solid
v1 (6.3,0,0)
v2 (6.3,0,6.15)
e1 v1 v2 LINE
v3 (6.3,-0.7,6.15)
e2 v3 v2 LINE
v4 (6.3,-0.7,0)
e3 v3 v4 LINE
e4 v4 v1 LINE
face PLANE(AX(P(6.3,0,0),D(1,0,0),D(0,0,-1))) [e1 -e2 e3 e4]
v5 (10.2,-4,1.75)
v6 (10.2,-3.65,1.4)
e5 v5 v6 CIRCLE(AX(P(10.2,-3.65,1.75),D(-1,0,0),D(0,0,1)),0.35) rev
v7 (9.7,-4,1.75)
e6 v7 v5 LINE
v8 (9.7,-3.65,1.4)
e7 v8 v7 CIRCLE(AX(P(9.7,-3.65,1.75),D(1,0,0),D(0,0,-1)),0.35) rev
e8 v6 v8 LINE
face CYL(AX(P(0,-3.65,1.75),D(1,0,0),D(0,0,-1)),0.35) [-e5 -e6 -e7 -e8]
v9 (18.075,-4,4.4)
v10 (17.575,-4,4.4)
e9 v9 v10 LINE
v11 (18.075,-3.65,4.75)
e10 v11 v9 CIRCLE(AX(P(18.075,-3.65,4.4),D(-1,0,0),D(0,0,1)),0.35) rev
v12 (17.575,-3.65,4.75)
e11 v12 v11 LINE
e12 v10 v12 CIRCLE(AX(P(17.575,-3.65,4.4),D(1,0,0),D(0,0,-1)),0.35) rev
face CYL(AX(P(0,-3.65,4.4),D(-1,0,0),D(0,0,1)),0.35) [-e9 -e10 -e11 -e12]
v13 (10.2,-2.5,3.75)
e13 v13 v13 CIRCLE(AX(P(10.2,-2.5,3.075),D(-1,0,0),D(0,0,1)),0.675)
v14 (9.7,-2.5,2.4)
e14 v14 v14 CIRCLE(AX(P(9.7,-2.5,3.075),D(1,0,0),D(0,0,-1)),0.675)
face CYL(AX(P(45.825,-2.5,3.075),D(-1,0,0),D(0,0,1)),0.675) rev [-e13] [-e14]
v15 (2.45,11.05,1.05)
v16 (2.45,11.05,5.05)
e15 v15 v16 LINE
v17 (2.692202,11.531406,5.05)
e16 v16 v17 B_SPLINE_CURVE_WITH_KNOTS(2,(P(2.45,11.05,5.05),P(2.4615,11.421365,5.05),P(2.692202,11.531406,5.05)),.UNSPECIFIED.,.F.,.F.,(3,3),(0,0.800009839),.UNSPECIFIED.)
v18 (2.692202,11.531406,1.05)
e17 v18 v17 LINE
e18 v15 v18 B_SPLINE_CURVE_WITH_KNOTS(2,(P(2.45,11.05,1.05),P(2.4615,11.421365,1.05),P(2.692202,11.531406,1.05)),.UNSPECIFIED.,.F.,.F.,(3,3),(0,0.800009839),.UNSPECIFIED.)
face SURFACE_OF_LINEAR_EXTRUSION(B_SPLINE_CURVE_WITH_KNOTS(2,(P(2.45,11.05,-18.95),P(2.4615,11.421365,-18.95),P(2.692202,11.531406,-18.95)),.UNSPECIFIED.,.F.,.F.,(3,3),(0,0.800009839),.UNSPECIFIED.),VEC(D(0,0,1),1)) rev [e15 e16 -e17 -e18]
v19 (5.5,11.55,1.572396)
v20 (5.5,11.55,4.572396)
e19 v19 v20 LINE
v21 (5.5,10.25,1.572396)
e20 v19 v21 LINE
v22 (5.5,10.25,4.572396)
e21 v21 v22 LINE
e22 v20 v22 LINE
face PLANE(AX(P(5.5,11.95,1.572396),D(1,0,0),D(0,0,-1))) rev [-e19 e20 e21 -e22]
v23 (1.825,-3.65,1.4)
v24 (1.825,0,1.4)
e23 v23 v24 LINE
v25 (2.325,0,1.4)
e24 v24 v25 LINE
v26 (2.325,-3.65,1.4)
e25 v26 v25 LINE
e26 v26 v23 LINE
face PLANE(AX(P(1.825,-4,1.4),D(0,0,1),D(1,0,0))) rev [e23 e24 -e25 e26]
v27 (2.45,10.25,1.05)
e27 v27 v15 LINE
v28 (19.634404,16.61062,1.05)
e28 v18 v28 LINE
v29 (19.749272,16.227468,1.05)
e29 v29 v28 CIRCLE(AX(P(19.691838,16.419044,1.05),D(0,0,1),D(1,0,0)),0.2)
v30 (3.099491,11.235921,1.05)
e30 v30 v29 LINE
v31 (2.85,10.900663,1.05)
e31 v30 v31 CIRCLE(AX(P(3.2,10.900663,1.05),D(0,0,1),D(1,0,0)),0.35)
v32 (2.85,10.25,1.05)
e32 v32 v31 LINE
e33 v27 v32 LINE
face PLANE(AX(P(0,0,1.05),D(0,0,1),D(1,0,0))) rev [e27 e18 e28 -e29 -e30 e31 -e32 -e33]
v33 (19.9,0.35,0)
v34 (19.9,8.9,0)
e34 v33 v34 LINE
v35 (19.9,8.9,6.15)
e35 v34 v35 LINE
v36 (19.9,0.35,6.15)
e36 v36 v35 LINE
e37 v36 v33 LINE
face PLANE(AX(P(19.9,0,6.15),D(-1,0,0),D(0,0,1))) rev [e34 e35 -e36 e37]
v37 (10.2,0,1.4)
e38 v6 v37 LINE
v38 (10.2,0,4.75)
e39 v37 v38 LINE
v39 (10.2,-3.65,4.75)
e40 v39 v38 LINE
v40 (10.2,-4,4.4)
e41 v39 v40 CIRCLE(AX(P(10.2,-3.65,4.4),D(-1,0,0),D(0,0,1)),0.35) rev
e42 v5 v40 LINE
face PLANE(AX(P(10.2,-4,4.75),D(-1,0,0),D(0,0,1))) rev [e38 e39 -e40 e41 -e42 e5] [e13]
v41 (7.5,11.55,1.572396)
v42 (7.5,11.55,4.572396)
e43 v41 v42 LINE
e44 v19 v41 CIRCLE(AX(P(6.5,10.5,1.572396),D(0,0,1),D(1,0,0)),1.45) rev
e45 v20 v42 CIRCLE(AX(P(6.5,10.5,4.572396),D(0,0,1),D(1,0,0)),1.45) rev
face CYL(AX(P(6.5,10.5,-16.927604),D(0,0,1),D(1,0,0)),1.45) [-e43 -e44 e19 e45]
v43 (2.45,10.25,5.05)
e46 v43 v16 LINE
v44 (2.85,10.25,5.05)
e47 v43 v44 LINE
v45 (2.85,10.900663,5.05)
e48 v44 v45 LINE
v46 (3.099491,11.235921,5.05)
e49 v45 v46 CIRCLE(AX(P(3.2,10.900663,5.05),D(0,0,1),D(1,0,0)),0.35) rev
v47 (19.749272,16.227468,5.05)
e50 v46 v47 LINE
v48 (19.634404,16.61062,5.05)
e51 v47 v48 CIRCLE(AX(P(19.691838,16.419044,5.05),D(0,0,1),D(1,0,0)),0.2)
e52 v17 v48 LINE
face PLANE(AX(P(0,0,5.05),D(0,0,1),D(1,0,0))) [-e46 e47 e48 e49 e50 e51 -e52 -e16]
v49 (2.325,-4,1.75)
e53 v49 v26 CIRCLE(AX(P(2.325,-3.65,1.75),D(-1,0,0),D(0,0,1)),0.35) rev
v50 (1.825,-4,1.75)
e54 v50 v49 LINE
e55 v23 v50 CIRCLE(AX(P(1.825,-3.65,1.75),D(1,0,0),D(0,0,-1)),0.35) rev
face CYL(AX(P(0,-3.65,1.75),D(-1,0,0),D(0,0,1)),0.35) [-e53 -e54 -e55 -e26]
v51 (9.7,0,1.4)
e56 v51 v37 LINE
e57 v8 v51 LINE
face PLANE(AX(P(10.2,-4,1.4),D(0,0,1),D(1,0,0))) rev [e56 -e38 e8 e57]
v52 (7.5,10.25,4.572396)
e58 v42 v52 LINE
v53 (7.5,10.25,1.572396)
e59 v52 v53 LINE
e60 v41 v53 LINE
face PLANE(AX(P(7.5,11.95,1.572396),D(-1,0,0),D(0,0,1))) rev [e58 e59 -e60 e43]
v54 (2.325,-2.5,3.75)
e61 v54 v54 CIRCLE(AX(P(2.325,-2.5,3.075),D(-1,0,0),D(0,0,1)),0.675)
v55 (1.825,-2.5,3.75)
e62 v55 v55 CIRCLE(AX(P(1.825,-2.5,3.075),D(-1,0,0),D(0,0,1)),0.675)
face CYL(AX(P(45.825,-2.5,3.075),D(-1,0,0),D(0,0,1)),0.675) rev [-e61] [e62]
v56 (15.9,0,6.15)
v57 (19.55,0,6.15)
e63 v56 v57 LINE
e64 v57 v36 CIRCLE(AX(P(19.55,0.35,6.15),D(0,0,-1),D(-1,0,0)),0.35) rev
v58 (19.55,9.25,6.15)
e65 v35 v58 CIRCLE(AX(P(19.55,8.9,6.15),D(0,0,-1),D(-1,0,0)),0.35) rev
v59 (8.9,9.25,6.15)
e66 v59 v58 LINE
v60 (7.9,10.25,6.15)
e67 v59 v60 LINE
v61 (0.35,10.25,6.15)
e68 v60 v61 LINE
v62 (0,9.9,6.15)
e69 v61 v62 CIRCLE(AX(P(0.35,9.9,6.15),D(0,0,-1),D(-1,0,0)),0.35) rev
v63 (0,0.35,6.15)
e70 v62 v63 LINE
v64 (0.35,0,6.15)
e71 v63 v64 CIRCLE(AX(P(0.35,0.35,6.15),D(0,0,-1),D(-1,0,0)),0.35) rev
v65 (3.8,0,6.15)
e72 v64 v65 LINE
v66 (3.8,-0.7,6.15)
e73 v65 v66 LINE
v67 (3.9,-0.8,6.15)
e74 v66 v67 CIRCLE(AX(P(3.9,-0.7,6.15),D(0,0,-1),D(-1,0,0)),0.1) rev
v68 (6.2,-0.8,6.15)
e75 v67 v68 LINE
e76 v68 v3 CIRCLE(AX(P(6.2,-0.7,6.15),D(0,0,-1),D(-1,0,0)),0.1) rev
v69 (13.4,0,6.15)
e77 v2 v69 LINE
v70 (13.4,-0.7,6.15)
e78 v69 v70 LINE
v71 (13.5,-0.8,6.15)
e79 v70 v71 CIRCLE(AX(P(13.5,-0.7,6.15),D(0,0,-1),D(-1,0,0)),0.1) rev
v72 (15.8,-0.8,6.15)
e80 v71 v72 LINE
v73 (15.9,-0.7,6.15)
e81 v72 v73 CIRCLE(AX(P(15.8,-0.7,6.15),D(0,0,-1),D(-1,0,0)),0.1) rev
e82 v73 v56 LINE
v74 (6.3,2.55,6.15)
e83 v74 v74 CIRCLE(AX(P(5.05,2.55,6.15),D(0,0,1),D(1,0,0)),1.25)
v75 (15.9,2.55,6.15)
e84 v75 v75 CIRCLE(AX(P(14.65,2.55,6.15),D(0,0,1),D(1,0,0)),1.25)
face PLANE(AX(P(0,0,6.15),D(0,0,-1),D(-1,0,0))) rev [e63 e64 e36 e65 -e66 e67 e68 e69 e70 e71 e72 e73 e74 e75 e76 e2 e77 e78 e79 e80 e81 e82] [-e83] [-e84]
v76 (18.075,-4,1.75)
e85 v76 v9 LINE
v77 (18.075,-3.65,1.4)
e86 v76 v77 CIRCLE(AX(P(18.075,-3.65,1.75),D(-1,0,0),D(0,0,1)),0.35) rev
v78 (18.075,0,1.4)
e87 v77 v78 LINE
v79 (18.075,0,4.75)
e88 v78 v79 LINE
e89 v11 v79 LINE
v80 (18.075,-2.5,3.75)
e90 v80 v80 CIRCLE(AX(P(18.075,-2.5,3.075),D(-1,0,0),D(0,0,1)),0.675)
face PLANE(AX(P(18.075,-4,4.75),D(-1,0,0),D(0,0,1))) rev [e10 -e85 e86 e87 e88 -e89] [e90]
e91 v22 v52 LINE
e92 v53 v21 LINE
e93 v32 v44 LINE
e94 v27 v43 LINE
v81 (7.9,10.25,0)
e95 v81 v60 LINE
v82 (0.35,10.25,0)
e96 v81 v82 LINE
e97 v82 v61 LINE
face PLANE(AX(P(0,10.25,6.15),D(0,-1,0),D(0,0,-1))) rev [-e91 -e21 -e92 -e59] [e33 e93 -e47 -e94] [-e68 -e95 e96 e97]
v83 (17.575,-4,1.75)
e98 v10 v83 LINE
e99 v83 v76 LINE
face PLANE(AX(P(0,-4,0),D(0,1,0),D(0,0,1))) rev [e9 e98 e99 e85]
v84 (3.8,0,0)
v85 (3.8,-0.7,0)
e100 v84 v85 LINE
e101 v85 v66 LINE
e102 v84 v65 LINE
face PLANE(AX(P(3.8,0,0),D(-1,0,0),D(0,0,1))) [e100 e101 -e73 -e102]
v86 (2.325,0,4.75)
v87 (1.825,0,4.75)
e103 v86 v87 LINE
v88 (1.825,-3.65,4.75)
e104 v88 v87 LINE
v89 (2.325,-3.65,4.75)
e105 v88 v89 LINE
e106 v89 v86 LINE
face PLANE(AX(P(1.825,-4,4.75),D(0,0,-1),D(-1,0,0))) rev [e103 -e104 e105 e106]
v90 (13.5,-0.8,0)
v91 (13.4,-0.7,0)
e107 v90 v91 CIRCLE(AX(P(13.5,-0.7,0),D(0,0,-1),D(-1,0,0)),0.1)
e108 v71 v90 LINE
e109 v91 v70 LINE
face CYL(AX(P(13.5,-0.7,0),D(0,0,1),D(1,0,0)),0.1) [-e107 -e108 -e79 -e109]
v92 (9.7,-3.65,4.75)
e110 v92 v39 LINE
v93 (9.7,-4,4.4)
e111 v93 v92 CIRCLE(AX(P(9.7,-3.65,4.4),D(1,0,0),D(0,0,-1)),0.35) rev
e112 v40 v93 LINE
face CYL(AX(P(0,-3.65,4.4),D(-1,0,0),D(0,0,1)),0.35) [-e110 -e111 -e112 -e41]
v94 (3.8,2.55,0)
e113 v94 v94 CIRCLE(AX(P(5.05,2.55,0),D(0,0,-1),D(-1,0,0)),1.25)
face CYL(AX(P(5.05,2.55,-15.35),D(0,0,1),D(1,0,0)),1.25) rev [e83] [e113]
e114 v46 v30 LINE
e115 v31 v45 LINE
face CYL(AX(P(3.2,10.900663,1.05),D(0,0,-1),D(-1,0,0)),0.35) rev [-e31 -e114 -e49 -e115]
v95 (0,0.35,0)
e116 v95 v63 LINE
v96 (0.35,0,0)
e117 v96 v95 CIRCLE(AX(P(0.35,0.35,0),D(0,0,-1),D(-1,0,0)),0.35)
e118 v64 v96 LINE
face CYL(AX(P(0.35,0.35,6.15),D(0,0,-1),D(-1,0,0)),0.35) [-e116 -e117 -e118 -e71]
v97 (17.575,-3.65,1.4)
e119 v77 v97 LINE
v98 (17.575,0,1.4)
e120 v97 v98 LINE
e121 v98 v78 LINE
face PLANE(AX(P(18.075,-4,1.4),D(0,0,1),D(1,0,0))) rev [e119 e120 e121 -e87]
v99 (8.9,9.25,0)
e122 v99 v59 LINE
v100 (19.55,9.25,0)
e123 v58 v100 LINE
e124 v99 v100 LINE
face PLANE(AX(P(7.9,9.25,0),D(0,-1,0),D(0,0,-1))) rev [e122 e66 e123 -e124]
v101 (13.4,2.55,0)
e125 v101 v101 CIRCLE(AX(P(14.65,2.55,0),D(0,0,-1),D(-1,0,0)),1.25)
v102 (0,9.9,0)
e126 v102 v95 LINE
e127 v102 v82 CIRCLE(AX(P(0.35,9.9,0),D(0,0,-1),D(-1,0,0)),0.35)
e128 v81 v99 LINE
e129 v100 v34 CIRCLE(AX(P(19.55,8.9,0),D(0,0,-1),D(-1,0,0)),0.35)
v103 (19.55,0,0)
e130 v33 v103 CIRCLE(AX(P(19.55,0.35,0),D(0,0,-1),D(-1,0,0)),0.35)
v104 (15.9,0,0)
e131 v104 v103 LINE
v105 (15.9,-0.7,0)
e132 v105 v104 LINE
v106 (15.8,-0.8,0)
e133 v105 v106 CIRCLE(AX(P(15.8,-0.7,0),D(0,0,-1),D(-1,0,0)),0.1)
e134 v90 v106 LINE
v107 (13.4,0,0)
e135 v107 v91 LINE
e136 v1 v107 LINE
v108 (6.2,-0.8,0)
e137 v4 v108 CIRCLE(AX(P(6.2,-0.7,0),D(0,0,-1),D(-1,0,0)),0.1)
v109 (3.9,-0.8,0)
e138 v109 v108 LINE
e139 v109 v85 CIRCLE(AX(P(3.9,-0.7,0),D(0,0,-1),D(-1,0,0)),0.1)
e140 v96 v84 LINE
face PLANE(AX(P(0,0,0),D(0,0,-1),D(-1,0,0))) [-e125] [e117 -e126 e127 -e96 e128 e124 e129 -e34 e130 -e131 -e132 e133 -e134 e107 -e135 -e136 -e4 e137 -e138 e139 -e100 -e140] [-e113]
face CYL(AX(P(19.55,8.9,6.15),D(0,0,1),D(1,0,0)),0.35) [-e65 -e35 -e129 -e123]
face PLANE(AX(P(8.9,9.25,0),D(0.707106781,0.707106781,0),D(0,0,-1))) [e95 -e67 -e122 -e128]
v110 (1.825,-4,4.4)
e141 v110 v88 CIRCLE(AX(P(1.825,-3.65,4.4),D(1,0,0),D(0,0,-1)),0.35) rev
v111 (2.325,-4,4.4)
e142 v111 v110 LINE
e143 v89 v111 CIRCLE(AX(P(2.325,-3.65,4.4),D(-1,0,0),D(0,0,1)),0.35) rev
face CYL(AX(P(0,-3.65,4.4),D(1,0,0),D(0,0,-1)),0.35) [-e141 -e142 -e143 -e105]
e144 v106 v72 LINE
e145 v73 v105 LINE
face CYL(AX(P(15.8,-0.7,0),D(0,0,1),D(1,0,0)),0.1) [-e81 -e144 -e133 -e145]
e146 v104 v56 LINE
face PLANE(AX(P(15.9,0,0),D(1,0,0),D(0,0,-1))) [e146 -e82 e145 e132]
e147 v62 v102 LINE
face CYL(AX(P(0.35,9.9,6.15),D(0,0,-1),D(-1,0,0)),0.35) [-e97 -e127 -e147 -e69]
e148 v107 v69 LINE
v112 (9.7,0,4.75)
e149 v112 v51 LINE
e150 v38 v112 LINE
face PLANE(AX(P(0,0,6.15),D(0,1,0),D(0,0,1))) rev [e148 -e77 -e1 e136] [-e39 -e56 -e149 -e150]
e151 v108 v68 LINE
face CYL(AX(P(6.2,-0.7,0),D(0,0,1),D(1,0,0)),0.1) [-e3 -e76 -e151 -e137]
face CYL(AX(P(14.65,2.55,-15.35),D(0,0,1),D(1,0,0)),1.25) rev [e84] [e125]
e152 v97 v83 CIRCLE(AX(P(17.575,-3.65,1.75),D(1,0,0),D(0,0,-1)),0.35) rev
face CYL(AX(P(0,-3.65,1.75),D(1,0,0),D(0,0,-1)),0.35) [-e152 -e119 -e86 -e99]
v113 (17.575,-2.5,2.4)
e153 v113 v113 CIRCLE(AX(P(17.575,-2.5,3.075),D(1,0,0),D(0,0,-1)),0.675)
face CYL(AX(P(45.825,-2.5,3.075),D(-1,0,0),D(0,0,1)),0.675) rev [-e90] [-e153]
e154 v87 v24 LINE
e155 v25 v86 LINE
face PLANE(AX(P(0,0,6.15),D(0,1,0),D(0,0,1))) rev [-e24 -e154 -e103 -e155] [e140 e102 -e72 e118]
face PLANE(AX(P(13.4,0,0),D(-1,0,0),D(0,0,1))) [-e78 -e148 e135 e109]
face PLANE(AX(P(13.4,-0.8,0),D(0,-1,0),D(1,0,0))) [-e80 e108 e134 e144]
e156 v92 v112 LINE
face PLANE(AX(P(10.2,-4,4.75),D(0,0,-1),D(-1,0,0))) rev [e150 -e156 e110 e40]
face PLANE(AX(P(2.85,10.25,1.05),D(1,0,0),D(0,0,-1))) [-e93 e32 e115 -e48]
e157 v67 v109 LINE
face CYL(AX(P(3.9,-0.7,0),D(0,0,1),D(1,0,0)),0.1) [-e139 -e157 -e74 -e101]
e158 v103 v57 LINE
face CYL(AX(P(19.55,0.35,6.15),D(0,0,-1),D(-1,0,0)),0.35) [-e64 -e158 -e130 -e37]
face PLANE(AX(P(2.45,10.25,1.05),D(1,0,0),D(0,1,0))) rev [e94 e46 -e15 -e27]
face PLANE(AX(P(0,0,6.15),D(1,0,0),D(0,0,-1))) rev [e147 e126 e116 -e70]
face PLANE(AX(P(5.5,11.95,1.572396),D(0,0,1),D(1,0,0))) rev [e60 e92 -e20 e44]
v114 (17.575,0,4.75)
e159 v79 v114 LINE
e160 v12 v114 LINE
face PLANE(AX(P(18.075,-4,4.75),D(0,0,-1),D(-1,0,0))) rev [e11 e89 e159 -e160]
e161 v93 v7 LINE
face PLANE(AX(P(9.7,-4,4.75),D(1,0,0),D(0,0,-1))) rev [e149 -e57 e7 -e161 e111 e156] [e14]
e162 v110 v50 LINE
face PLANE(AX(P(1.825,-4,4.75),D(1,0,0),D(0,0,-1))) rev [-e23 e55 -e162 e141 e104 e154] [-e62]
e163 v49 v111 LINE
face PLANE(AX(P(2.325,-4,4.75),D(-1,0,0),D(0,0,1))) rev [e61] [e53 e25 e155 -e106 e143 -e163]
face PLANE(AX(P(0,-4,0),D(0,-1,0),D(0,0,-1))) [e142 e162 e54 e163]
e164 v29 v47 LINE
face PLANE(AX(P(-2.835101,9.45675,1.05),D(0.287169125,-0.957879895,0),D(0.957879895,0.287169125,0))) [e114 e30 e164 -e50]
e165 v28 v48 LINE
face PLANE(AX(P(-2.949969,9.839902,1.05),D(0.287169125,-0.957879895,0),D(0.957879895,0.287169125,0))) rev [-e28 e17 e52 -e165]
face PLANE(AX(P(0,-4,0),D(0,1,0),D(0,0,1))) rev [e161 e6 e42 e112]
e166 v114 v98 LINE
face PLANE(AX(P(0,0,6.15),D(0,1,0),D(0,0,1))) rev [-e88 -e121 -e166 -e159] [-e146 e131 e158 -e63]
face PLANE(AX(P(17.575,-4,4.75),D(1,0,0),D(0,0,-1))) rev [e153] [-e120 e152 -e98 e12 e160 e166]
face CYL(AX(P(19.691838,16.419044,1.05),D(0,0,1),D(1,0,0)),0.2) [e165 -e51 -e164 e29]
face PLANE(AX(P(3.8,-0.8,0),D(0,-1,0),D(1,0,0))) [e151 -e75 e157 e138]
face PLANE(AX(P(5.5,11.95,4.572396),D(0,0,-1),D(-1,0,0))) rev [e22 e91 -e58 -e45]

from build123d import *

# Parameters (mm, degrees)
SKETCH1_W           = 19.9
SKETCH1_H           = 10.25
BOSS_EXTRUDE1_DEPTH = 6.15
SKETCH2_W           = 12
SKETCH2_H           = 1
CUT_EXTRUDE1_DEPTH  = 6.15
FILLET1_SIZE        = 1
FILLET2_R           = 0.35
SKETCH3_W           = 2
SKETCH3_H           = 3
BOSS_EXTRUDE2_DEPTH = 1.7
CUT_EXTRUDE2_DEPTH  = 21.5
SKETCH5_R           = 1.25
CUT_EXTRUDE3_DEPTH  = 21.5
SKETCH6_W           = 2.5
SKETCH6_H           = 0.8
BOSS_EXTRUDE3_DEPTH = 6.15
FILLET3_R           = 0.1
SKETCH7_W           = 0.5
SKETCH7_H           = 3.35
BOSS_EXTRUDE4_DEPTH = 4
SKETCH8_R           = 0.675
CUT_EXTRUDE4_DEPTH  = 44
FILLET4_R           = 0.35
BOSS_EXTRUDE5_START = -1.1
SKETCH9_W           = 0.4
SKETCH9_H           = 1
BOSS_EXTRUDE5_DEPTH = 4
CUT_EXTRUDE7_DEPTH  = 24
FILLET6_R           = 0.35


with BuildPart() as part:
    # Sketch1 → Boss-Extrude1 (new body)
    with BuildSketch(Plane.XY):
        with Locations((9.95, 5.125)):
            Rectangle(SKETCH1_W, SKETCH1_H)
    extrude(amount=BOSS_EXTRUDE1_DEPTH)

    # Sketch2 → Cut-Extrude1 (cut)
    with BuildSketch(Plane.XY.offset(6.15)):
        with Locations((13.9, 9.75)):
            Rectangle(SKETCH2_W, SKETCH2_H)
    extrude(amount=-CUT_EXTRUDE1_DEPTH, mode=Mode.SUBTRACT)

    # Fillet1
    fillet1_edges = [part.edges().sort_by_distance(p)[0] for p in [
        (7.9, 9.25, 3.075),
    ]]
    chamfer(fillet1_edges, length=FILLET1_SIZE - 0.0001)  # a hair under: the kernel refuses the full size

    # Fillet2
    fillet2_edges = [part.edges().sort_by_distance(p)[0] for p in [
        (19.9, 9.25, 3.075),
        (0, 10.25, 3.075),
        (19.9, 0, 3.075),
        (0, 0, 3.075),
    ]]
    fillet(fillet2_edges, radius=FILLET2_R)

    # Sketch3 → Boss-Extrude2 (add)
    with BuildSketch(Plane(origin=(0, 10.25, 0), x_dir=(1, 0, 0), z_dir=(0, 1, 0))):
        with Locations((6.5, -3.072396368)):
            Rectangle(SKETCH3_W, SKETCH3_H)
    extrude(amount=BOSS_EXTRUDE2_DEPTH)

    # Sketch4 → Cut-Extrude2 (cut)
    with BuildSketch(Plane.XY.offset(4.572396368)):
        with BuildLine():
            Line((5.5, 11.95), (5.5, 11.55))
            ThreePointArc((5.5, 11.55), (5.961483519, 11.846291202), (6.5, 11.95))
            Line((6.5, 11.95), (5.5, 11.95))
        make_face()
        with BuildLine():
            Line((7.5, 11.95), (6.5, 11.95))
            ThreePointArc((6.5, 11.95), (7.038516481, 11.846291202), (7.5, 11.55))
            Line((7.5, 11.55), (7.5, 11.95))
        make_face()
    extrude(amount=-CUT_EXTRUDE2_DEPTH, mode=Mode.SUBTRACT)

    # Sketch5 → Cut-Extrude3 (cut)
    with BuildSketch(Plane.XY.offset(6.15)):
        with Locations((5.05, 2.55)):
            Circle(SKETCH5_R)
        with Locations((14.65, 2.55)):
            Circle(SKETCH5_R)
    extrude(amount=-CUT_EXTRUDE3_DEPTH, mode=Mode.SUBTRACT)

    # Sketch6 → Boss-Extrude3 (add)
    with BuildSketch(Plane.XY.offset(6.15)):
        with Locations((5.05, -0.4)):
            Rectangle(SKETCH6_W, SKETCH6_H)
        with Locations((14.65, -0.4)):
            Rectangle(SKETCH6_W, SKETCH6_H)
    extrude(amount=-BOSS_EXTRUDE3_DEPTH)

    # Fillet3
    fillet3_edges = [part.edges().sort_by_distance(p)[0] for p in [
        (15.9, -0.8, 3.075),
        (13.4, -0.8, 3.075),
        (6.3, -0.8, 3.075),
        (3.8, -0.8, 3.075),
    ]]
    fillet(fillet3_edges, radius=FILLET3_R)

    # Sketch7 → Boss-Extrude4 (add)
    with BuildSketch(Plane.XZ):
        with Locations((2.075, 3.075)):
            Rectangle(SKETCH7_W, SKETCH7_H)
        with Locations((17.825, 3.075)):
            Rectangle(SKETCH7_W, SKETCH7_H)
        with Locations((9.95, 3.075)):
            Rectangle(SKETCH7_W, SKETCH7_H)
    extrude(amount=BOSS_EXTRUDE4_DEPTH)

    # Sketch8 → Cut-Extrude4 (cut)
    with BuildSketch(Plane.ZY.offset(-1.825)):
        with Locations((3.075, -2.5)):
            Circle(SKETCH8_R)
    extrude(amount=-CUT_EXTRUDE4_DEPTH, mode=Mode.SUBTRACT)

    # Fillet4
    fillet4_edges = [part.edges().sort_by_distance(p)[0] for p in [
        (2.075, -4, 1.4),
        (2.075, -4, 4.75),
        (17.825, -4, 4.75),
        (17.825, -4, 1.4),
        (9.95, -4, 4.75),
        (9.95, -4, 1.4),
    ]]
    fillet(fillet4_edges, radius=FILLET4_R)

    # Sketch9 → Boss-Extrude5 (add)
    with BuildSketch(Plane.XY.offset(6.15).offset(BOSS_EXTRUDE5_START)):
        with Locations((2.65, 10.75)):
            Rectangle(SKETCH9_W, SKETCH9_H)
        with BuildLine():
            Line((2.392566175, 11.441575979), (19.634404289, 16.61062023))
            ThreePointArc((19.634404289, 16.61062023), (19.883414093, 16.476478076), (19.749271939, 16.227468271))
            Line((19.749271939, 16.227468271), (2.507433825, 11.058424021))
            ThreePointArc((2.507433825, 11.058424021), (2.258424021, 11.192566175), (2.392566175, 11.441575979))
        make_face()
    extrude(amount=-BOSS_EXTRUDE5_DEPTH)

    # Sketch12 → Cut-Extrude7 (cut)
    with BuildSketch(Plane.XY.offset(5.05)):
        with BuildLine():
            Line((2.392566175, 11.441575979), (2.692202246, 11.531405851))
            add(Edge.make_bspline(
                [(2.45, 11.05), (2.461499925, 11.421364666), (2.692202246, 11.531405851)],
                knots=[0, 0, 0, 0.800009839, 0.800009839, 0.800009839], degree=2))
            ThreePointArc((2.45, 11.05), (2.252117212, 11.220975836), (2.392566175, 11.441575979))
        make_face()
    extrude(amount=-CUT_EXTRUDE7_DEPTH, mode=Mode.SUBTRACT)

    # Fillet6
    fillet6_edges = [part.edges().sort_by_distance(p)[0] for p in [
        (2.85, 11.161124192, 3.05),
    ]]
    fillet(fillet6_edges, radius=FILLET6_R)


solid = part.part
